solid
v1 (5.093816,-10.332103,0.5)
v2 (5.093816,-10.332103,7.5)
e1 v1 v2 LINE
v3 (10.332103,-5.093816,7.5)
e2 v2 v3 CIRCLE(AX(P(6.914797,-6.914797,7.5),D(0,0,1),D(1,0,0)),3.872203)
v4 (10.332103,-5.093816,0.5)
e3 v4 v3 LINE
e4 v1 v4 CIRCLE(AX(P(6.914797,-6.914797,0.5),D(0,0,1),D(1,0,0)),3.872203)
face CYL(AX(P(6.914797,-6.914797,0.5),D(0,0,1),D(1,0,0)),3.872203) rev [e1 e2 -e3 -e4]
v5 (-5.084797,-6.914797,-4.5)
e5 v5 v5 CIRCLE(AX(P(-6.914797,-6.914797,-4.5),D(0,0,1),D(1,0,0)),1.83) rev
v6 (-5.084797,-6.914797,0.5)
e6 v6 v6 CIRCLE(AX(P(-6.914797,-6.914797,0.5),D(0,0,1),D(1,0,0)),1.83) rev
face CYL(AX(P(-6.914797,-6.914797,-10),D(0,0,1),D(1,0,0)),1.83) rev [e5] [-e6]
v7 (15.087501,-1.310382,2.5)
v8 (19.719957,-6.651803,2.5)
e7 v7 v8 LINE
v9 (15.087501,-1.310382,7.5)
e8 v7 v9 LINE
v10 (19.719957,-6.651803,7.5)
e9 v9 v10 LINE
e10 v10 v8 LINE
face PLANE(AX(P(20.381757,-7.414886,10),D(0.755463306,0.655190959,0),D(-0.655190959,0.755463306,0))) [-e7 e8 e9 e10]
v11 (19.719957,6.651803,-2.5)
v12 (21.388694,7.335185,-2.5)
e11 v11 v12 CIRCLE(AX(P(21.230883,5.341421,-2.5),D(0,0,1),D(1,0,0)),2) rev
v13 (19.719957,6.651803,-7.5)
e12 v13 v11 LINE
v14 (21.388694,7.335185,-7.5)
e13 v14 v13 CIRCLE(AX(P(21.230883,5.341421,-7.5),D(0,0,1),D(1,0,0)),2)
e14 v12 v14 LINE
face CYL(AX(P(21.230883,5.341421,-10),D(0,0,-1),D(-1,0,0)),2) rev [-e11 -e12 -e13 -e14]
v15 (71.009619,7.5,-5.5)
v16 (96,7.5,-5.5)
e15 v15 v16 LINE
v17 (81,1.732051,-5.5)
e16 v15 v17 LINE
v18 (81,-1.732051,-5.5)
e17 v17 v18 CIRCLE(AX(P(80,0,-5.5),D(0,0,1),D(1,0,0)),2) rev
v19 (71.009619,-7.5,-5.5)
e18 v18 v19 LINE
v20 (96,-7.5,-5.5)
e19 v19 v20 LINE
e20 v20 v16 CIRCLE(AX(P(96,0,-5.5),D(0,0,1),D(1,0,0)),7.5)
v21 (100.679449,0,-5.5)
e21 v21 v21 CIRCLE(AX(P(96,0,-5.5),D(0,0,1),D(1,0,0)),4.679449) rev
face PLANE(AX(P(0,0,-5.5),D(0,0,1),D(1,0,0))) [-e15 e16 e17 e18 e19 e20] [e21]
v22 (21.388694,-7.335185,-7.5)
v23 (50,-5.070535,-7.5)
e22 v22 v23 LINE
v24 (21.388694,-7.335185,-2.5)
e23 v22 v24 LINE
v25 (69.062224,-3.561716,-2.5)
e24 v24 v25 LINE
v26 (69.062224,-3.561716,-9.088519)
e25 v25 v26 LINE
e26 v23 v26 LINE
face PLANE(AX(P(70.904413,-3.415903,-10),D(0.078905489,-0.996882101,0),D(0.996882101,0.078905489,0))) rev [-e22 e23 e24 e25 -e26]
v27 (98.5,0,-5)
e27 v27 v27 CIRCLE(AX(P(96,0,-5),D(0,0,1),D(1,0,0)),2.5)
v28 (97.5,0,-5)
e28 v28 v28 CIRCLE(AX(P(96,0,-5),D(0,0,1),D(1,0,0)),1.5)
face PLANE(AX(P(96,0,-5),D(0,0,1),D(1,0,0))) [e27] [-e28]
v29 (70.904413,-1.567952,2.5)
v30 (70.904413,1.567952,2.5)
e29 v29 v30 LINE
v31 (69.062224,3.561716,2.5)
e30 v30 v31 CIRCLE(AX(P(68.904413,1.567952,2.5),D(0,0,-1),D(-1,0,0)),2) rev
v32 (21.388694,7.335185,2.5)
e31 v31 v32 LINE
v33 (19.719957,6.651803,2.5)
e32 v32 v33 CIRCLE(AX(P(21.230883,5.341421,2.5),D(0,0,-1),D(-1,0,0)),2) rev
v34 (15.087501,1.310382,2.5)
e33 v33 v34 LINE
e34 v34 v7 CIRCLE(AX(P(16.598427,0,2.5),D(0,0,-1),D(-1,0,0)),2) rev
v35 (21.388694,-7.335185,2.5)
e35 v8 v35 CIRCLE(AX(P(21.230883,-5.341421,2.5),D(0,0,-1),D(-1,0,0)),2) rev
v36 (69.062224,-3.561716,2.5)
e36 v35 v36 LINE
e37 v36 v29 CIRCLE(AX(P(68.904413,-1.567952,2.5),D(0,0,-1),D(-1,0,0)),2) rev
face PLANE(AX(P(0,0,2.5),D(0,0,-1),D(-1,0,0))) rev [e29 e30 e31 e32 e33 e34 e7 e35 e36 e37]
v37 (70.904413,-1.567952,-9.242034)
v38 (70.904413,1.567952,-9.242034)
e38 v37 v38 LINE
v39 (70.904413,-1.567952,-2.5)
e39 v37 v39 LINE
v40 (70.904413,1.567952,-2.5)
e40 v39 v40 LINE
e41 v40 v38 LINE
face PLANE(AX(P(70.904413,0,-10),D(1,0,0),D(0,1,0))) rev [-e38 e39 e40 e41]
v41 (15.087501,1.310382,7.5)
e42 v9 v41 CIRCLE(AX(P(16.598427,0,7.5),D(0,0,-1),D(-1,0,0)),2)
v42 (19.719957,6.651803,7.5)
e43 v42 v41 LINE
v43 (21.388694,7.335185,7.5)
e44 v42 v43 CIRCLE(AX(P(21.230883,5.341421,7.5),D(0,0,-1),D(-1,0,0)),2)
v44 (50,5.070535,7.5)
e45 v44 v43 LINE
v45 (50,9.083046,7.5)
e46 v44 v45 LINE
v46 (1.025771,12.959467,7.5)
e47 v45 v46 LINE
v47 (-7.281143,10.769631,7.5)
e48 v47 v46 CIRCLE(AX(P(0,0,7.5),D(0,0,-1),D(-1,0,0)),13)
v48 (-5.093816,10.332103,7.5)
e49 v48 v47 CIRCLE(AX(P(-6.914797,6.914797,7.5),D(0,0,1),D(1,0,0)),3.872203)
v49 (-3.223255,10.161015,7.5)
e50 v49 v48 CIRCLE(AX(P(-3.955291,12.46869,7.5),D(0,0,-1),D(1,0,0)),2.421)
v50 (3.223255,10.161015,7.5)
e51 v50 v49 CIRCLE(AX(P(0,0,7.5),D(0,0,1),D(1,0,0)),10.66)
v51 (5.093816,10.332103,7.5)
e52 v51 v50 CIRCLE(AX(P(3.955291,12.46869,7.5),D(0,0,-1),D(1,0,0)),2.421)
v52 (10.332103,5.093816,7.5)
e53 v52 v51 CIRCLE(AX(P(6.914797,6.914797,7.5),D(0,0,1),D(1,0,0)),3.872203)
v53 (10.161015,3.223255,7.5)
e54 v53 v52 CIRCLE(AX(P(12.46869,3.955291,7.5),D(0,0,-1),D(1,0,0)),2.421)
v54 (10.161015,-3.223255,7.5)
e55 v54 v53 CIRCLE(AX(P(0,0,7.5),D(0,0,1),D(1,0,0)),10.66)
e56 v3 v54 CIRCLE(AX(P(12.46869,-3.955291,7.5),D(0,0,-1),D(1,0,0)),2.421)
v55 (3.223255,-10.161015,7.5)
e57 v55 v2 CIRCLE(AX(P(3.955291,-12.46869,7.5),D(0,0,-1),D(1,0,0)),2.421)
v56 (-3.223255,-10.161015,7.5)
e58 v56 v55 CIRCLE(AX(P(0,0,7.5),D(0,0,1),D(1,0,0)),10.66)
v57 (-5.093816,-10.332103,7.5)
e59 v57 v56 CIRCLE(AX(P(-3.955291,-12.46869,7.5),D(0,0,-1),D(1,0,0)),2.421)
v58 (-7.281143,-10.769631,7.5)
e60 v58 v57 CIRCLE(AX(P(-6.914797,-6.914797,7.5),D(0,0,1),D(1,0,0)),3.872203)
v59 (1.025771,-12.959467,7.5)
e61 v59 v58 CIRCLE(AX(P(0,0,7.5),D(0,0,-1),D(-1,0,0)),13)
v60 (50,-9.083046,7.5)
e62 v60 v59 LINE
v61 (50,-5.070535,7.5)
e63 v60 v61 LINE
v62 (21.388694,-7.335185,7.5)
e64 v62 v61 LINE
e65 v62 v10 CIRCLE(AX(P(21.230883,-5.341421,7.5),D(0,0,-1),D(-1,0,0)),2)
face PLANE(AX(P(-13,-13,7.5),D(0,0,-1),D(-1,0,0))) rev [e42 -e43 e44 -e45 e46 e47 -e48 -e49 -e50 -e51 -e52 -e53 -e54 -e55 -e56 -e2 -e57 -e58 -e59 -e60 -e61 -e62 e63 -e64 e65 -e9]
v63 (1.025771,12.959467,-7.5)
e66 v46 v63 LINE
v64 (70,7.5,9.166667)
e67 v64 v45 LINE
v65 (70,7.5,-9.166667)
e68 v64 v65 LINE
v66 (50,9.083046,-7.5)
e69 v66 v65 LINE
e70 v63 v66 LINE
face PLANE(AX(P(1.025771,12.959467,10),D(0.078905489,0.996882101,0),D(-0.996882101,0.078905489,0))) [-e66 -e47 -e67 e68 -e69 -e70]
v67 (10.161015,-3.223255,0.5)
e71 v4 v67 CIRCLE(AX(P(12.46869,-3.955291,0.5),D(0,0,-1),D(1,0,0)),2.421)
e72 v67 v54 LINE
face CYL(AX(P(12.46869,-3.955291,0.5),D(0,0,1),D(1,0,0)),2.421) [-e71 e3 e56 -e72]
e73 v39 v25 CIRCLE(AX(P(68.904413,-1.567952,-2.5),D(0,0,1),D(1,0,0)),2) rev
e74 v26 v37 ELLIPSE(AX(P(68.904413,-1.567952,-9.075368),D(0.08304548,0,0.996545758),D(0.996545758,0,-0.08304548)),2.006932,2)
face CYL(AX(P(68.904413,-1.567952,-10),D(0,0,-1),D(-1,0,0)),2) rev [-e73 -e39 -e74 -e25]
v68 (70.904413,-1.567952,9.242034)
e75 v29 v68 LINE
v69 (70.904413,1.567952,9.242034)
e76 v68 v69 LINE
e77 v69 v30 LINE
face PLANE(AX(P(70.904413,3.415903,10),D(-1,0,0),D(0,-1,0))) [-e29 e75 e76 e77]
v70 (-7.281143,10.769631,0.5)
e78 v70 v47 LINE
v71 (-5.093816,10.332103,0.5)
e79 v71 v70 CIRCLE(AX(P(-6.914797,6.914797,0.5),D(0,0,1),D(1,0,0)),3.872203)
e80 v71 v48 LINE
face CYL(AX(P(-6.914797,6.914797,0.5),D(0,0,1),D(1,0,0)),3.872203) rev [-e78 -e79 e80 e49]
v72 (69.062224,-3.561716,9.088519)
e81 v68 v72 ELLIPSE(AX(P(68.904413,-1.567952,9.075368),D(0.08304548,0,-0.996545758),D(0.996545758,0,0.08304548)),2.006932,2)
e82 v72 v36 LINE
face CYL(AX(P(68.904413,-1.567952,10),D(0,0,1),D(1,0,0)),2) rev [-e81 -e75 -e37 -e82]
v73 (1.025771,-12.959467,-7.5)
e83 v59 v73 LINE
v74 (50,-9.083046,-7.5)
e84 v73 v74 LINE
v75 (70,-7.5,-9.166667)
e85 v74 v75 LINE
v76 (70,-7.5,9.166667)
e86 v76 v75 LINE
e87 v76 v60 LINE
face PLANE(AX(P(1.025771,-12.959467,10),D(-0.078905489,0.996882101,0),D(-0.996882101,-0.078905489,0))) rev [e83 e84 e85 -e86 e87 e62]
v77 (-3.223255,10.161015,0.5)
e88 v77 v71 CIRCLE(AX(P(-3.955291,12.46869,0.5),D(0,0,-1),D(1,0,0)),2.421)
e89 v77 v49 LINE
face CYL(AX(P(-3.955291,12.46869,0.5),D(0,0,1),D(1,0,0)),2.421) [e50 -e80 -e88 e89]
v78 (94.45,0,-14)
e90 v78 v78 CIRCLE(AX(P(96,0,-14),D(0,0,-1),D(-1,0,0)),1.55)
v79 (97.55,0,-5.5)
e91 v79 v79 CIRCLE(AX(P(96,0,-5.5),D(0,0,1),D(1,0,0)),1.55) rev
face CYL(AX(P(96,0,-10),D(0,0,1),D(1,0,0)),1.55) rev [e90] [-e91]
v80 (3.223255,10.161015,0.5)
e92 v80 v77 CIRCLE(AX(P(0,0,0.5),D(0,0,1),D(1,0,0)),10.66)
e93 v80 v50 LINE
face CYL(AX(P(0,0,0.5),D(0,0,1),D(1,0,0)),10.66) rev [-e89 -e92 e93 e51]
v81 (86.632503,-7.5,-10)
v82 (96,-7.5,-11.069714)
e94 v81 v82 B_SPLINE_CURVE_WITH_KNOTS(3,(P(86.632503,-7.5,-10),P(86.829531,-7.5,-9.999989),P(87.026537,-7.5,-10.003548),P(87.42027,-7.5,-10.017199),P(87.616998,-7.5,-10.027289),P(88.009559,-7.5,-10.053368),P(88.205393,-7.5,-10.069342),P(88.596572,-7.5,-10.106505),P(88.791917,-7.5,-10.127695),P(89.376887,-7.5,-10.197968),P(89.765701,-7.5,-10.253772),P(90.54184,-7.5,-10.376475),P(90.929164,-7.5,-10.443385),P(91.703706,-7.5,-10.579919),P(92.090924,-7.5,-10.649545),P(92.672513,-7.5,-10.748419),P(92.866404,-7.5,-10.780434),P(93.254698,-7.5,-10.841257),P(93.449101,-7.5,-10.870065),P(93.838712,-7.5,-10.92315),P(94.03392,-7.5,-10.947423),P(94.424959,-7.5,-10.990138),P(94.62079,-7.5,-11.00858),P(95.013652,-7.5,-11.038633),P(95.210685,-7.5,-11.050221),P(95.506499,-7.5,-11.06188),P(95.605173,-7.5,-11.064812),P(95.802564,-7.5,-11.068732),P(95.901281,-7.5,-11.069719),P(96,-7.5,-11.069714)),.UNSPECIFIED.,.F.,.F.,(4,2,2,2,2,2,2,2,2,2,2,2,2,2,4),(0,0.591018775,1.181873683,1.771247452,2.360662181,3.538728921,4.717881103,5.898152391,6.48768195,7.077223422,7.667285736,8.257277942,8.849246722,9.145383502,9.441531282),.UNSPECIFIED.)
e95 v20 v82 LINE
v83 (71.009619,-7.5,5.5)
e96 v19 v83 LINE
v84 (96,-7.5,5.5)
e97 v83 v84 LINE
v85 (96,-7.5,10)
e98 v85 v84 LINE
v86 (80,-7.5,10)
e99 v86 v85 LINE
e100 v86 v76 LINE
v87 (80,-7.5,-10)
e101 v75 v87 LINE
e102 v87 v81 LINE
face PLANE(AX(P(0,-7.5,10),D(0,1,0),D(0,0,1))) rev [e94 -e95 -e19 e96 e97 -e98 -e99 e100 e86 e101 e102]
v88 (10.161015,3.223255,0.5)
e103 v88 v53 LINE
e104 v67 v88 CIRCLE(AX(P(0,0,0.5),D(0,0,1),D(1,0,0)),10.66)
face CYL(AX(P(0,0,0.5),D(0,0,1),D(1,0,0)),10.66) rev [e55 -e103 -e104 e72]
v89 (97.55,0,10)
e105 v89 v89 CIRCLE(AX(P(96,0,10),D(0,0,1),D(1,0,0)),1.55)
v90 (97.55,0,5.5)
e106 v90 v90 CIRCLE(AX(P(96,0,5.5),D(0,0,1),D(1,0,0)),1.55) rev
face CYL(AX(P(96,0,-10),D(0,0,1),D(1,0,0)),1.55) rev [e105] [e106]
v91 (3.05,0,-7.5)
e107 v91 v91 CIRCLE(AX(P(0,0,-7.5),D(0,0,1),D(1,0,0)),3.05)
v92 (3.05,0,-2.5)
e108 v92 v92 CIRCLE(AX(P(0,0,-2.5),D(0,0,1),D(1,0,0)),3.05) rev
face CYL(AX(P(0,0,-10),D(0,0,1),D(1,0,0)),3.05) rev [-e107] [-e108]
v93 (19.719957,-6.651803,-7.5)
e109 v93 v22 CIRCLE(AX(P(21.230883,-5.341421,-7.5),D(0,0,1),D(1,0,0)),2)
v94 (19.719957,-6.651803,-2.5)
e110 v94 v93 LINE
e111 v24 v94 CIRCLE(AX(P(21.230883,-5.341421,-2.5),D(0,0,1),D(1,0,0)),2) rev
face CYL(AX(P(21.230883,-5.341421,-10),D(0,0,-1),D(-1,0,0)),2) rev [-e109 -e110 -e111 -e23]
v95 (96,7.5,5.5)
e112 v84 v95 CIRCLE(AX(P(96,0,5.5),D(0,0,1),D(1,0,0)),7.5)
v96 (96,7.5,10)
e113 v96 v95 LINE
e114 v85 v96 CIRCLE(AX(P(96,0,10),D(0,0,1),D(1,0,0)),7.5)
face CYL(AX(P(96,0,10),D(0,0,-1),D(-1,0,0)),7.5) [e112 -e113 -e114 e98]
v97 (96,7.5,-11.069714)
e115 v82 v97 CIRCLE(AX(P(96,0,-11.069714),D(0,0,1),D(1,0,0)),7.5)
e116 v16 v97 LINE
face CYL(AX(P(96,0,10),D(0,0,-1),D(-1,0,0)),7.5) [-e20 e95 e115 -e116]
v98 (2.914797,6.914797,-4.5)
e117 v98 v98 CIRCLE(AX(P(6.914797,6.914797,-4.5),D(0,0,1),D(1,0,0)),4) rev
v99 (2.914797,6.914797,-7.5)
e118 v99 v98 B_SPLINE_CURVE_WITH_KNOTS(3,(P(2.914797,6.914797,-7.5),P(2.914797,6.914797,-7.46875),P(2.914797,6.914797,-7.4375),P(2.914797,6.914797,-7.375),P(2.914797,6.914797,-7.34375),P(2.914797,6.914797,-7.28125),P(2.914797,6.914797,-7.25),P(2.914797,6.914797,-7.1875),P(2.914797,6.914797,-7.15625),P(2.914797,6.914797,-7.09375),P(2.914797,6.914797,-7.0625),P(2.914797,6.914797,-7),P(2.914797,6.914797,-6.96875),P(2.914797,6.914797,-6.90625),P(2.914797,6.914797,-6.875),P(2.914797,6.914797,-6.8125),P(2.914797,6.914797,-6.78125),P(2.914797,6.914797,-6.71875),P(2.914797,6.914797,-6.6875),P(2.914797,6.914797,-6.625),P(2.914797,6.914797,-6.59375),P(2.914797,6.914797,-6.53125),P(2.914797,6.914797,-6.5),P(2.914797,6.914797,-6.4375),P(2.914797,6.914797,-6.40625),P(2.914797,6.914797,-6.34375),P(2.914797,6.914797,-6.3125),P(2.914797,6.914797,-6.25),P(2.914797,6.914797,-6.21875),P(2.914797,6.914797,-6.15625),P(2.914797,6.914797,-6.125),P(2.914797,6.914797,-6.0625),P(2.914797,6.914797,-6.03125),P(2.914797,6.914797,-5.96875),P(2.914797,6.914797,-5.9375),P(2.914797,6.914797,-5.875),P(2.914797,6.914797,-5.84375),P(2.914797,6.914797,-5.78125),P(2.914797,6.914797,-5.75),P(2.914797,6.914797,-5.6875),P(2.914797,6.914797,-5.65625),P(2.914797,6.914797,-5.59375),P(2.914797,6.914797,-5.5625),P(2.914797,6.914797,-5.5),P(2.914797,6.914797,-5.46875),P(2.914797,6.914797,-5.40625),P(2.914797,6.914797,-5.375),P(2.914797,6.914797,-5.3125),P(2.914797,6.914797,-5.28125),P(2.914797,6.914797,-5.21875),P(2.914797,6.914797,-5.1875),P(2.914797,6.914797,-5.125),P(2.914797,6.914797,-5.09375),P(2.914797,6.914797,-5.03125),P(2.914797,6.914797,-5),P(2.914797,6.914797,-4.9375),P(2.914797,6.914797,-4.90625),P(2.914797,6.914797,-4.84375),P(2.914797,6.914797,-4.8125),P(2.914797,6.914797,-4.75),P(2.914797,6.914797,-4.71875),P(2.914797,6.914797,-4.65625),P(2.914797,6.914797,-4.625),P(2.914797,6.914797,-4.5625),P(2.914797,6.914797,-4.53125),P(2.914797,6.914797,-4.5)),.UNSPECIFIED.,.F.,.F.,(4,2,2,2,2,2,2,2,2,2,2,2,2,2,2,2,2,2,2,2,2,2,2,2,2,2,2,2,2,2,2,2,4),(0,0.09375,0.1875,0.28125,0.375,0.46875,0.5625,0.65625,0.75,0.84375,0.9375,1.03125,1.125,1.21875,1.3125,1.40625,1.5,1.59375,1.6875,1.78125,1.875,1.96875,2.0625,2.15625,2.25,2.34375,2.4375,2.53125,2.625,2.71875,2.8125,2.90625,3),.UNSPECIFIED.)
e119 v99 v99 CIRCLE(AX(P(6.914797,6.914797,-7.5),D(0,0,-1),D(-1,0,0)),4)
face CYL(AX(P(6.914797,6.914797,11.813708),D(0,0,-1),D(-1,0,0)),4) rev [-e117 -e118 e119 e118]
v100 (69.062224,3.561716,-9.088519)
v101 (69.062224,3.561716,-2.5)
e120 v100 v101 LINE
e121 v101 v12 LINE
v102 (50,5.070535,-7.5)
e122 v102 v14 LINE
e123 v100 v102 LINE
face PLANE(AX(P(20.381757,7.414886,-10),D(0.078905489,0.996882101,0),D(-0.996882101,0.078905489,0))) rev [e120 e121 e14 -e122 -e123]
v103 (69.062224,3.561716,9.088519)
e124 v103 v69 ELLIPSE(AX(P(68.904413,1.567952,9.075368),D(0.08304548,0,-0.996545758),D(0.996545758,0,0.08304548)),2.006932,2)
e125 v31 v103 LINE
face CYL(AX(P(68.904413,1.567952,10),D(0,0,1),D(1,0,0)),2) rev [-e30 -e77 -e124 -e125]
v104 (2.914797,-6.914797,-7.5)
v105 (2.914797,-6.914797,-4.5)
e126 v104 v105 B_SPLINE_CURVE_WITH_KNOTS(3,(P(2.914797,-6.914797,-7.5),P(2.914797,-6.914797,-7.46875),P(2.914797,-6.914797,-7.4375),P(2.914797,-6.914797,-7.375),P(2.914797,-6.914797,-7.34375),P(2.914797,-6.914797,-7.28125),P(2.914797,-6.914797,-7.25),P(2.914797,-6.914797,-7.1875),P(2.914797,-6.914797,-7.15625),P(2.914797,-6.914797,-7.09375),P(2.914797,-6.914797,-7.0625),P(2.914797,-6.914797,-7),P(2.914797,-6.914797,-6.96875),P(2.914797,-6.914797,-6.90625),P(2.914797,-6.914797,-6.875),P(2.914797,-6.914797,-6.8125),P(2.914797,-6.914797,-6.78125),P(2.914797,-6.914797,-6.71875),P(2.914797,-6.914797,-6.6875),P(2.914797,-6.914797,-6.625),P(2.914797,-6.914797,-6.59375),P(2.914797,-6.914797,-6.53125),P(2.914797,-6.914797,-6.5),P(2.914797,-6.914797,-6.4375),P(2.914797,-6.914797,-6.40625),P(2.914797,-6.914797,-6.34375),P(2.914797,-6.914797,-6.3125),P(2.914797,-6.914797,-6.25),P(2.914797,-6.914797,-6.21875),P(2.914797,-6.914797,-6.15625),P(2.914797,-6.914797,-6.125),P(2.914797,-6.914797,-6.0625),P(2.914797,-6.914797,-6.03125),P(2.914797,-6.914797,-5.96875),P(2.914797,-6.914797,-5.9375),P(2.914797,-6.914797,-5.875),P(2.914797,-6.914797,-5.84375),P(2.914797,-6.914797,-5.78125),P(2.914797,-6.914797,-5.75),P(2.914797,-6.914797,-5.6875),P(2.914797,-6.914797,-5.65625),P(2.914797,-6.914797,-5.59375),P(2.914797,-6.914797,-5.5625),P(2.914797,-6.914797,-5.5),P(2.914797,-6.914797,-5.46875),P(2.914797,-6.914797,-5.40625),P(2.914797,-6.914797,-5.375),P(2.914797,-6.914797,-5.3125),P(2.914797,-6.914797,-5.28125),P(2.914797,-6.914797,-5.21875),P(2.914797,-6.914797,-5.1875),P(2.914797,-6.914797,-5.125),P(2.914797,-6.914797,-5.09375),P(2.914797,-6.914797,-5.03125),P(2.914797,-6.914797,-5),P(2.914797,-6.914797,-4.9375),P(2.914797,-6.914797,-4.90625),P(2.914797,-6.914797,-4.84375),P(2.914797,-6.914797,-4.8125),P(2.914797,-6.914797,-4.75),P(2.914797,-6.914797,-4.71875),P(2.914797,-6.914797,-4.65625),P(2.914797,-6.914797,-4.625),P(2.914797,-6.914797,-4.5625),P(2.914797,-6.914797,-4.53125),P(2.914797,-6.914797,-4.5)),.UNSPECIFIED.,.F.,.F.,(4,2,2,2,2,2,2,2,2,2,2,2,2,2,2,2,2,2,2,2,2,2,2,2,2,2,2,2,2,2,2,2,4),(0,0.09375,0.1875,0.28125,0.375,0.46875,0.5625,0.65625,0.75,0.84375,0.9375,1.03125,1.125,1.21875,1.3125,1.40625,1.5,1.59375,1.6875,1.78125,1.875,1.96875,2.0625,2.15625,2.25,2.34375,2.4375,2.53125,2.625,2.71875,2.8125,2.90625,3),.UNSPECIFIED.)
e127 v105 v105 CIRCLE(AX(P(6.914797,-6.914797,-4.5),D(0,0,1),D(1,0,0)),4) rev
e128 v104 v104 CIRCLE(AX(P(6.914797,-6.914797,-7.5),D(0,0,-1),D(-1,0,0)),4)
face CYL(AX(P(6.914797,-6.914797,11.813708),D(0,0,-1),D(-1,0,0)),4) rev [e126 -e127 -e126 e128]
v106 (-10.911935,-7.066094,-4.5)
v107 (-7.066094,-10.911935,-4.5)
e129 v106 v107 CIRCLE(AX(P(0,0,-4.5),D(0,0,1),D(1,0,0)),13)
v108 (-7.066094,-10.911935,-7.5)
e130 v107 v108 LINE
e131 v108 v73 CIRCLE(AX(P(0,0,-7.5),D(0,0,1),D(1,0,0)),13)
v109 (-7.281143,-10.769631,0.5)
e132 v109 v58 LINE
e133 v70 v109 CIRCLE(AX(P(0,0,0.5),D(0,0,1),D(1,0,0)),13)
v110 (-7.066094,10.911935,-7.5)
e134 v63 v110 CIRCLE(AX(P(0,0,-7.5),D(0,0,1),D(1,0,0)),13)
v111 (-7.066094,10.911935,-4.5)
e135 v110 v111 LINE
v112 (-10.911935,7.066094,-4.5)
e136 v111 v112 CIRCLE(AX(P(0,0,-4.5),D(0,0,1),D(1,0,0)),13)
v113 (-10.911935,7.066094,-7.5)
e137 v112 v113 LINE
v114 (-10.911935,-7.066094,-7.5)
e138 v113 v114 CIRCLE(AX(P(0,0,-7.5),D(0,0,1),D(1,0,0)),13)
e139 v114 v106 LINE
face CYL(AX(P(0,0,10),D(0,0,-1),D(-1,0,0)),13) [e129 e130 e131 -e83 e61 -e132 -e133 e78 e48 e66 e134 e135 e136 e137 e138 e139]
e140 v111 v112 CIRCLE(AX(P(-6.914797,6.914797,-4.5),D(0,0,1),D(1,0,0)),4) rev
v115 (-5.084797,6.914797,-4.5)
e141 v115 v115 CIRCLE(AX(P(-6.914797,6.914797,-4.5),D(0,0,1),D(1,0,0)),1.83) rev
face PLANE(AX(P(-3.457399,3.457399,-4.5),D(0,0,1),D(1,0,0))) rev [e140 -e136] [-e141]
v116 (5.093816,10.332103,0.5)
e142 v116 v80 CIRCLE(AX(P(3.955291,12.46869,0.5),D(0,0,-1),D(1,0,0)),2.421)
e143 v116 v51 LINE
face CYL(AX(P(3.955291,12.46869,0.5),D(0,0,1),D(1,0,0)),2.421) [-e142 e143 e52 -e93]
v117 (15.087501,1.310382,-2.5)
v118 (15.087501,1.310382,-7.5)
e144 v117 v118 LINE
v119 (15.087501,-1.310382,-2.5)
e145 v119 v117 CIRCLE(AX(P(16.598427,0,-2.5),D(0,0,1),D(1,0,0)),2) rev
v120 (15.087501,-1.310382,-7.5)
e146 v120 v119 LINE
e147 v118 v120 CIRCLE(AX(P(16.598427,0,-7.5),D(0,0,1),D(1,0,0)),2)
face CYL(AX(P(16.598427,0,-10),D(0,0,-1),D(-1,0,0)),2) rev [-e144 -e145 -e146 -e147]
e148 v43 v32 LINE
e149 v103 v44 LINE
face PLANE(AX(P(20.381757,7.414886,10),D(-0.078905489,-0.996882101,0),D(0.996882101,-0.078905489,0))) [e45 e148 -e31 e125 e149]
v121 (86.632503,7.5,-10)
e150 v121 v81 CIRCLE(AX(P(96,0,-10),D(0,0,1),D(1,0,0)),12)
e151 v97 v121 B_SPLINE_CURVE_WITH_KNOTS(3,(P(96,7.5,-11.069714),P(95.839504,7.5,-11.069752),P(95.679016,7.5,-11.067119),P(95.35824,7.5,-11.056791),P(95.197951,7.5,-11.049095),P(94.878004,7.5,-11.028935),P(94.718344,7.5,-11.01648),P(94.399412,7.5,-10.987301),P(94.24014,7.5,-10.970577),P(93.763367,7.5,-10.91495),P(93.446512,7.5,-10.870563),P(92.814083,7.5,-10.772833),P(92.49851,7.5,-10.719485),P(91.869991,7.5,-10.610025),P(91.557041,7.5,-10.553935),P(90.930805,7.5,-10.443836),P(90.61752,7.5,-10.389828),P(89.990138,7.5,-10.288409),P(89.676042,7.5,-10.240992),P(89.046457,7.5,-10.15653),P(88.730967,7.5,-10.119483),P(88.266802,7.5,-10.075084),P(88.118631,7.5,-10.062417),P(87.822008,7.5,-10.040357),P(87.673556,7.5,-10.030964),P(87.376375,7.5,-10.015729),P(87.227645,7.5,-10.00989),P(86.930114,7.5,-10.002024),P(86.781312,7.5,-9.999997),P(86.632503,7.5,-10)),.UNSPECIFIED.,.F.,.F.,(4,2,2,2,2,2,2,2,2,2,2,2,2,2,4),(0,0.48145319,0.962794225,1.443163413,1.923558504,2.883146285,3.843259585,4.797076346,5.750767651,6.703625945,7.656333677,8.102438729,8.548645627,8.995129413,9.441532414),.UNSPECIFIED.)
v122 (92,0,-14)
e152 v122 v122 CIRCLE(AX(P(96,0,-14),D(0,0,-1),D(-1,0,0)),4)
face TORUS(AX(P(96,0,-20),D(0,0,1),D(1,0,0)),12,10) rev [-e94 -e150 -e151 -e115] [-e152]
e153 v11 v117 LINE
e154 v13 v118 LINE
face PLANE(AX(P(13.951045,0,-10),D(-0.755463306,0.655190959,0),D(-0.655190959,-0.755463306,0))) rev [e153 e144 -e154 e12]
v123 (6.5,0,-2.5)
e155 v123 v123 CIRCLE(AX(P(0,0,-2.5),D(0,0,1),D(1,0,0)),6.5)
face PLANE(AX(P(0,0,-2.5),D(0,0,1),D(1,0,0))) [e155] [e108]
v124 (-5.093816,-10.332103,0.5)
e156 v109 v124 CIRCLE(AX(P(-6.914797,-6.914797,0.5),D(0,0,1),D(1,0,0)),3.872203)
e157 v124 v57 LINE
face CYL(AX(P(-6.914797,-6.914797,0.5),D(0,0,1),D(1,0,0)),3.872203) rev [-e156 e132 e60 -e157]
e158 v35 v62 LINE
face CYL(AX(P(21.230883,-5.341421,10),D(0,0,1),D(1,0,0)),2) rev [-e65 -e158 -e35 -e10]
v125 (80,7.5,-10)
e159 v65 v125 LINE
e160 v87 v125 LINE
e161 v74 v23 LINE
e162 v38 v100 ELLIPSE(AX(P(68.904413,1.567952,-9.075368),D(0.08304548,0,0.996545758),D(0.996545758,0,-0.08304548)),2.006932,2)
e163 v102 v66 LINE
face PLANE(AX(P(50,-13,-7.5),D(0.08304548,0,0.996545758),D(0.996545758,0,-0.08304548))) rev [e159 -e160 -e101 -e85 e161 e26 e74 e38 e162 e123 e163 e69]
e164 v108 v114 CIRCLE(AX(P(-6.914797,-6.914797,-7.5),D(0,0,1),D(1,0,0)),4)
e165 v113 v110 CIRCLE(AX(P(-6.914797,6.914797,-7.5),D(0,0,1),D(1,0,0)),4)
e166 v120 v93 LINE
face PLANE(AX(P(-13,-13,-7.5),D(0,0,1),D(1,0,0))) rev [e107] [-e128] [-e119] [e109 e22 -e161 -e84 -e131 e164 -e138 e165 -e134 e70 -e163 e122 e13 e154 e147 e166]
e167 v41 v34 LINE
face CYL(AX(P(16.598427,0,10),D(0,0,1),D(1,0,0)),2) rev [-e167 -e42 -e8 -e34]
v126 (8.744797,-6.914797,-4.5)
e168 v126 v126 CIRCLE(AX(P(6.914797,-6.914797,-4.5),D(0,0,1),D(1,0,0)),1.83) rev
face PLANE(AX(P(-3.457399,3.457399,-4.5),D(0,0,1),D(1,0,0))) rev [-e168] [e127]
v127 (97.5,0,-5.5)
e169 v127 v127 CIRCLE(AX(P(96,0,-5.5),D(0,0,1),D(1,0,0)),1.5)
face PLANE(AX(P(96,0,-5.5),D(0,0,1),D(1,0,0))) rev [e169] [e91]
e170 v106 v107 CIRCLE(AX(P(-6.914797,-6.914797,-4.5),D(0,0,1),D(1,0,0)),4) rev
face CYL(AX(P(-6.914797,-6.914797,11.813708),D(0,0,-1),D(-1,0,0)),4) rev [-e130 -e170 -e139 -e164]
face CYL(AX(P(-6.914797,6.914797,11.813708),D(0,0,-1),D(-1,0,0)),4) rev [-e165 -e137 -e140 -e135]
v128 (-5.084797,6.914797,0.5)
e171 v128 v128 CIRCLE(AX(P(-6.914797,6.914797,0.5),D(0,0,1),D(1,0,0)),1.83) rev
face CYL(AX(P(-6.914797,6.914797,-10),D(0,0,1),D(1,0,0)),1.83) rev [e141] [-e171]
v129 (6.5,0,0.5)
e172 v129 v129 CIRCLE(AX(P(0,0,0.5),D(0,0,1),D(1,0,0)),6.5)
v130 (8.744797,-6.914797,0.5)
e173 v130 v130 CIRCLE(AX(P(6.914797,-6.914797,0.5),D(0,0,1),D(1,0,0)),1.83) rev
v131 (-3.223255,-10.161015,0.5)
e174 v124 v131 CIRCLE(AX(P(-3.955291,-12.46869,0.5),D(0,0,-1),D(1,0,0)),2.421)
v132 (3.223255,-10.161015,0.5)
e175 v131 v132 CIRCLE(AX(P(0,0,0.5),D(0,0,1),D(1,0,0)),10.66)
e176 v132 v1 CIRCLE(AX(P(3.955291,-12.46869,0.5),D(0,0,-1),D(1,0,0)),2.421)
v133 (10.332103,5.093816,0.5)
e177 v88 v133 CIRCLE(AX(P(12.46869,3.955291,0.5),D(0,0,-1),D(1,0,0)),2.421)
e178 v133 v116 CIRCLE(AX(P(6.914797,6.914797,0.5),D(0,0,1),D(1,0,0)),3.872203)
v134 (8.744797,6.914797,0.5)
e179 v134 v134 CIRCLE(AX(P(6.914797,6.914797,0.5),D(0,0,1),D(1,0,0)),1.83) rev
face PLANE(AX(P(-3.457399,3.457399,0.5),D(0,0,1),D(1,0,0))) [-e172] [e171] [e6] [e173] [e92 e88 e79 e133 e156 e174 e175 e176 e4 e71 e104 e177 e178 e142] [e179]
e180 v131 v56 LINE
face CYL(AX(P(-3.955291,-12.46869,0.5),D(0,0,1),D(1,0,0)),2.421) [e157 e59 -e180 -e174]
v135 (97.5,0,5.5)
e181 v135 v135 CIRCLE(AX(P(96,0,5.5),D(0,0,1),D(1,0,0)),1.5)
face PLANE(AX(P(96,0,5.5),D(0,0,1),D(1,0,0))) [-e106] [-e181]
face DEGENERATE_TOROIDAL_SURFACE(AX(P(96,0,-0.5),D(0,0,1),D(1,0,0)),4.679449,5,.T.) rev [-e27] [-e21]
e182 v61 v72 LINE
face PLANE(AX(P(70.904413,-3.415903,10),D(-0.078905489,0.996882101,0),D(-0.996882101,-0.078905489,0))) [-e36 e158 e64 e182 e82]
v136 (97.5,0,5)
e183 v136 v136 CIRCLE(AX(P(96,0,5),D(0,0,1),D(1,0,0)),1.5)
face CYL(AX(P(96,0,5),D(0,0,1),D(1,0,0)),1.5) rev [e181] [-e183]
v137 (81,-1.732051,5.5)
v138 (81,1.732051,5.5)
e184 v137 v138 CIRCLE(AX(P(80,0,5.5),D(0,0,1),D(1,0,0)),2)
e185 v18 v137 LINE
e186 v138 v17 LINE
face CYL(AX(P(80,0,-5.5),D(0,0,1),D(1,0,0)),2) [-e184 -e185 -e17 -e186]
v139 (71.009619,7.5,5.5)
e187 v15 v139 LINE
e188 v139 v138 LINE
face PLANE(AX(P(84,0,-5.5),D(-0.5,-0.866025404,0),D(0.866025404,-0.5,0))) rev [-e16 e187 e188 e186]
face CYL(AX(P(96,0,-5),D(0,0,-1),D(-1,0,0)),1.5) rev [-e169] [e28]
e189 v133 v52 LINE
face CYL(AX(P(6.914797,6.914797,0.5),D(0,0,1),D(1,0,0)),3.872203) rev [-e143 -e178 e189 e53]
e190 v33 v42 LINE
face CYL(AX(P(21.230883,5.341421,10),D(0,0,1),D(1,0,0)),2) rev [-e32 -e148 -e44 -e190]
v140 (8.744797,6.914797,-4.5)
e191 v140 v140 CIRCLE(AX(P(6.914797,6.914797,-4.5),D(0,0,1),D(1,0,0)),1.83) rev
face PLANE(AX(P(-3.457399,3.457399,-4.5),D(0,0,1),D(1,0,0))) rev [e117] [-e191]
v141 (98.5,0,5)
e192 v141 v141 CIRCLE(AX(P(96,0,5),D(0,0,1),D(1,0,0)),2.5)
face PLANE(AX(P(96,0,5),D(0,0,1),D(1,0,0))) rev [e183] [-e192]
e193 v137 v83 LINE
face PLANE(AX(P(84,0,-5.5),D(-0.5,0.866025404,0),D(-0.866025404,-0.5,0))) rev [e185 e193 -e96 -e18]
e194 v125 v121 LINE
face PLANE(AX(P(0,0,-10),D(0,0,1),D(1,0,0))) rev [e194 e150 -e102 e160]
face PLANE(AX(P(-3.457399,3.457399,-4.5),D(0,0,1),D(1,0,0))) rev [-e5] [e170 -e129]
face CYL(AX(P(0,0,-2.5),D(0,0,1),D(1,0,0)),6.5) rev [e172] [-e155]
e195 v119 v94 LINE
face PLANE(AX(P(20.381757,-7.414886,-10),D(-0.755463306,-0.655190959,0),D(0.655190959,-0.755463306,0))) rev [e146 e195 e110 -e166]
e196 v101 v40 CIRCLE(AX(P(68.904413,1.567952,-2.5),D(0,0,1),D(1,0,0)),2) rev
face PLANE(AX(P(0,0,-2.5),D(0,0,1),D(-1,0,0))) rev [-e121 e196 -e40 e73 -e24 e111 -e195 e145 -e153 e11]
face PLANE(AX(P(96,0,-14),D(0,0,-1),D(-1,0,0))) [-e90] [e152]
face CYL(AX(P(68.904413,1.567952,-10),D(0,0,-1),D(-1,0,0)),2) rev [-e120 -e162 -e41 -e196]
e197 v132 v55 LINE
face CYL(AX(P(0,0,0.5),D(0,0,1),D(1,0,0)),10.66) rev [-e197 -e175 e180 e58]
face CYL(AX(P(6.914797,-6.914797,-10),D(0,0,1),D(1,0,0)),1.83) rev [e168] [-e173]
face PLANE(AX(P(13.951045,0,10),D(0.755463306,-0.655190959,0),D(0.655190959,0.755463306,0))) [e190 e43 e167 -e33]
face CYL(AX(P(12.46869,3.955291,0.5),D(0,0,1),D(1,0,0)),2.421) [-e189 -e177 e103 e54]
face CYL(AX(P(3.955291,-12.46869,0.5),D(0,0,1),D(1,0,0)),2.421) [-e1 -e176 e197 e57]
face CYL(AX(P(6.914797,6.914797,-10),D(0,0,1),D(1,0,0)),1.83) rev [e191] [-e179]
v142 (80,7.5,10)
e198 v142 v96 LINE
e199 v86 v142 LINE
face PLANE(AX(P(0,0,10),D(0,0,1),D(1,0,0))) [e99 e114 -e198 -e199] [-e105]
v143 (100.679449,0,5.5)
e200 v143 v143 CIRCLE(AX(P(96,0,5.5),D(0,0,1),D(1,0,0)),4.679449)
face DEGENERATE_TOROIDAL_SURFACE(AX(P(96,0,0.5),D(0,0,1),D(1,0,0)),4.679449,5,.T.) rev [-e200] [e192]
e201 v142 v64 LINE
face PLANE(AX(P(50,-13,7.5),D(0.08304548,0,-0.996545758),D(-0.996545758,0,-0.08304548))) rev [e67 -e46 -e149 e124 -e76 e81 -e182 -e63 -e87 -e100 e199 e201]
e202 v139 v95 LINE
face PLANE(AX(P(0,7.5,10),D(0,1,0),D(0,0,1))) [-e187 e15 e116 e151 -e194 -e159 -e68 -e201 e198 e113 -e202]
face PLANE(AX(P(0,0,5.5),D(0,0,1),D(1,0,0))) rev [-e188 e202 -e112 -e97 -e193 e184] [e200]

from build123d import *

# Parameters (mm, degrees)
SKETCH2_R               = 13
SKETCH2_R_2             = 7.5
BOSS_EXTRUDE2_DEPTH     = 10
CUT_EXTRUDE1_DEPTH      = 105.791459576
CUT_EXTRUDE1_DEPTH_BACK = 105.791459576
SKETCH5_R               = 1.83
SKETCH5_R_2             = 3.05
CUT_EXTRUDE2_DEPTH      = 106.770979007
HUB_CUTOUT_DEPTH        = 7
SKETCH8_R               = 6.5
CUT_EXTRUDE4_DEPTH      = 3
CUT_EXTRUDE5_DEPTH      = 105.791459576
CUT_EXTRUDE5_DEPTH_BACK = 105.791459576
SKETCH9_R               = 1.55
CUT_EXTRUDE6_DEPTH      = 5.5
FILLET1_R               = 2
CUT_EXTRUDE7_START      = 2.5
CUT_EXTRUDE7_DEPTH      = 103.291459576
FILLET2_R               = 2
FILLET2_OF_MIRROR1_R    = 2
SKETCH12_R              = 4
SKETCH12_R_2            = 1.55
BOSS_EXTRUDE3_DEPTH     = 4
FILLET3_START           = -14
FILLET3_2_DEPTH         = 4
BOSS_EXTRUDE4_START     = 5.5
SKETCH13_R              = 2.5
SKETCH13_R_2            = 1.5
BOSS_EXTRUDE4_DEPTH     = 0.5
BOSS_EXTRUDE5_START     = -5
SKETCH13_2_R            = 2.5
SKETCH13_2_R_2          = 1.5
BOSS_EXTRUDE5_DEPTH     = 0.5
FILLET4_R               = 5
SKETCH15_R              = 4
CUT_EXTRUDE8_DEPTH      = 3


with BuildPart() as part:
    # Sketch2 → Boss-Extrude2 (new, symmetric)
    with BuildSketch(Plane.XY):
        Circle(SKETCH2_R)
        with BuildLine():
            Line((70, 7.5), (1.025771359, 12.959467316))
            ThreePointArc((1.025771359, 12.959467316), (9.548168088, 8.822272166), (13, 0))
            ThreePointArc((13, 0), (9.548168088, -8.822272166), (1.025771359, -12.959467316))
            Line((1.025771359, -12.959467316), (70, -7.5))
            Line((70, -7.5), (70, 7.5))
        make_face()
        with BuildLine():
            Line((96, 7.5), (70, 7.5))
            Line((70, 7.5), (70, -7.5))
            Line((70, -7.5), (96, -7.5))
            ThreePointArc((96, -7.5), (88.5, 0), (96, 7.5))
        make_face()
        with Locations((96, 0)):
            Circle(SKETCH2_R_2)
        Circle(SKETCH2_R)
    extrude(amount=BOSS_EXTRUDE2_DEPTH, both=True)

    # Sketch4 → Cut-Extrude1 (cut, two sides: drawn at the far end of the back side and taken through both)
    with BuildSketch(Plane(origin=(0, 0, 0), x_dir=(1, 0, 0), z_dir=(0, 1, 0)).offset(-CUT_EXTRUDE1_DEPTH_BACK)):
        Polygon((-13, 7.5), (50, 7.5), (80, 10), (-13, 10), align=None)
        Polygon((-13, -7.5), (50, -7.5), (80, -10), (-13, -10), align=None)
    extrude(amount=CUT_EXTRUDE1_DEPTH + CUT_EXTRUDE1_DEPTH_BACK, mode=Mode.SUBTRACT)

    # Sketch5 → Cut-Extrude2 (cut, through all)
    with BuildSketch(Plane.XY.offset(7.5)):
        with Locations((-6.914797213, 6.914797213)):
            Circle(SKETCH5_R)
        with Locations((6.914797213, 6.914797213)):
            Circle(SKETCH5_R)
        with Locations((6.914797213, -6.914797213)):
            Circle(SKETCH5_R)
        with Locations((-6.914797213, -6.914797213)):
            Circle(SKETCH5_R)
        Circle(SKETCH5_R_2)
    extrude(amount=-CUT_EXTRUDE2_DEPTH, mode=Mode.SUBTRACT)

    # Sketch7 → hub cutout (cut)
    with BuildSketch(Plane.XY.offset(7.5)):
        with BuildLine():
            ThreePointArc((-7.281143007, 10.769631215), (-13, 0), (-7.281143007, -10.769631215))
            ThreePointArc((-7.281143007, -10.769631215), (-6.15529138, -10.711783559), (-5.093815501, -10.332103173))
            ThreePointArc((-5.093815501, -10.332103173), (-4.17580433, -10.057753531), (-3.223255475, -10.161014917))
            ThreePointArc((-3.223255475, -10.161014917), (0, -10.66), (3.223255475, -10.161014917))
            ThreePointArc((3.223255475, -10.161014917), (4.17580433, -10.057753531), (5.093815501, -10.332103173))
            ThreePointArc((5.093815501, -10.332103173), (9.652858062, -9.652858062), (10.332103173, -5.093815501))
            ThreePointArc((10.332103173, -5.093815501), (10.057753531, -4.17580433), (10.161014917, -3.223255475))
            ThreePointArc((10.161014917, -3.223255475), (10.66, 0), (10.161014917, 3.223255475))
            ThreePointArc((10.161014917, 3.223255475), (10.057753531, 4.17580433), (10.332103173, 5.093815501))
            ThreePointArc((10.332103173, 5.093815501), (9.652858062, 9.652858062), (5.093815501, 10.332103173))
            ThreePointArc((5.093815501, 10.332103173), (4.17580433, 10.057753531), (3.223255475, 10.161014917))
            ThreePointArc((3.223255475, 10.161014917), (0, 10.66), (-3.223255475, 10.161014917))
            ThreePointArc((-3.223255475, 10.161014917), (-4.17580433, 10.057753531), (-5.093815501, 10.332103173))
            ThreePointArc((-5.093815501, 10.332103173), (-6.15529138, 10.711783559), (-7.281143007, 10.769631215))
        make_face()
    extrude(amount=-HUB_CUTOUT_DEPTH, mode=Mode.SUBTRACT)

    # Sketch8 → Cut-Extrude4 (cut)
    with BuildSketch(Plane.XY.offset(0.5)):
        Circle(SKETCH8_R)
    extrude(amount=-CUT_EXTRUDE4_DEPTH, mode=Mode.SUBTRACT)

    # Sketch9 → Cut-Extrude5 (cut, two sides: drawn at the far end of the back side and taken through both)
    with BuildSketch(Plane.XY.offset(-CUT_EXTRUDE5_DEPTH_BACK)):
        with Locations((96, 0)):
            Circle(SKETCH9_R)
    extrude(amount=CUT_EXTRUDE5_DEPTH + CUT_EXTRUDE5_DEPTH_BACK, mode=Mode.SUBTRACT)

    # Sketch10 → Cut-Extrude6 (cut, symmetric)
    with BuildSketch(Plane.XY):
        Polygon((84, 0), (62.184725581, 12.595054558), (110.068063566, 12.595054558), (110.068063566, -12.520209035), (62.31436183, -12.520209035), align=None)
    extrude(amount=CUT_EXTRUDE6_DEPTH, both=True, mode=Mode.SUBTRACT)

    # Fillet1
    fillet1_edges = [part.edges().sort_by_distance(p)[0] for p in [
        (84, 0, 0),
    ]]
    fillet(fillet1_edges, radius=FILLET1_R)

    # Sketch11 → Cut-Extrude7 (cut, through all)
    with BuildSketch(Plane.XY.offset(CUT_EXTRUDE7_START)):
        Polygon((13.951045221, 0), (20.381756661, 7.414886386), (70.904413477, 3.415903011), (70.904413477, 0), (70.904413477, -3.415903011), (20.381756661, -7.414886386), align=None)
    cut_extrude7 = extrude(amount=CUT_EXTRUDE7_DEPTH, mode=Mode.SUBTRACT)

    # Fillet2
    fillet2_edges = [part.edges().sort_by_distance(p)[0] for p in [
        (13.951045221, 0, 5),
        (20.381756661, 7.414886386, 5),
        (20.381756661, -7.414886386, 5),
        (70.904413477, -3.415903011, 5.871017228),
        (70.904413477, 3.415903011, 5.871017228),
    ]]
    fillet(fillet2_edges, radius=FILLET2_R)

    # Mirror1: Cut-Extrude7 across plane
    add(cut_extrude7.mirror(Plane.XY), mode=Mode.SUBTRACT)

    # Fillet2 of Mirror1
    fillet2_of_mirror1_edges = [part.edges().sort_by_distance(p)[0] for p in [
        (13.951045221, 0, -5),
        (20.381756661, 7.414886386, -5),
        (20.381756661, -7.414886386, -5),
        (70.904413477, -3.415903011, -5.871017228),
        (70.904413477, 3.415903011, -5.871017228),
    ]]
    fillet(fillet2_of_mirror1_edges, radius=FILLET2_OF_MIRROR1_R)

    # Sketch12 → Boss-Extrude3 (add)
    with BuildSketch(Plane(origin=(0, 0, -10), x_dir=(-1, 0, 0), z_dir=(0, 0, -1))):
        with Locations(Location((-96, 0, 0), (0, 0, 180))):
            Circle(SKETCH12_R)
        with Locations(Location((-96, 0, 0), (0, 0, 180))):
            Circle(SKETCH12_R_2, mode=Mode.SUBTRACT)
    extrude(amount=BOSS_EXTRUDE3_DEPTH)

    # Fillet3: read off the stored shape, not the designer's step
    # Fillet3 outline → Fillet3 (revolve)
    with BuildSketch(Plane(origin=(96, 0, 0), x_dir=(1, 0, 0), z_dir=(0, -1, 0))):
        with BuildLine():
            ThreePointArc((4, -14), (7.527864045, -11.05572809), (12, -10))
            Line((12, -10), (4, -10))
            Line((4, -10), (4, -14))
        make_face()
    revolve(axis=Axis((96, 0, 0), (0, 0, 1)))

    # Fillet3 2 outline → Fillet3 2 (cut)
    with BuildSketch(Plane.XY.offset(FILLET3_START)):
        with BuildLine():
            ThreePointArc((96, 7.5), (103.5, 0), (96, -7.5))
            Line((96, -7.5), (85, -7.5))
            Line((85, -7.5), (85, -13))
            Line((85, -13), (109, -13))
            Line((109, -13), (109, 13))
            Line((109, 13), (85, 13))
            Line((85, 13), (85, 7.5))
            Line((85, 7.5), (96, 7.5))
        make_face()
    extrude(amount=FILLET3_2_DEPTH, mode=Mode.SUBTRACT)

    # Sketch13 → Boss-Extrude4 (add)
    with BuildSketch(Plane.XY.offset(BOSS_EXTRUDE4_START)):
        with Locations((96, 0)):
            Circle(SKETCH13_R)
        with Locations((96, 0)):
            Circle(SKETCH13_R_2, mode=Mode.SUBTRACT)
    extrude(amount=-BOSS_EXTRUDE4_DEPTH)

    # Sketch13<2> → Boss-Extrude5 (add)
    with BuildSketch(Plane.XY.offset(BOSS_EXTRUDE5_START)):
        with Locations((96, 0)):
            Circle(SKETCH13_2_R)
        with Locations((96, 0)):
            Circle(SKETCH13_2_R_2, mode=Mode.SUBTRACT)
    extrude(amount=-BOSS_EXTRUDE5_DEPTH)

    # Fillet4
    # the kernel refuses this fillet: 5 mm, written as the material it adds along each edge
    with BuildSketch(Plane(origin=(96, 0, 5.5), x_dir=(1, 0, 0), z_dir=(0, -1, 0))) as fillet4_piece_1:
        with BuildLine():
            CenterArc((4.679449472, -5), FILLET4_R, 90, 25.841932763)
            Line((2.5, -0.5), (2.456411011, -0.41))
            ThreePointArc((2.456411011, -0.41), (2.4, -0.25), (2.4, 0))
            Line((2.4, 0), (2.5, 0.1))
            Line((2.5, 0.1), (4.679449472, 0.1))
            Line((4.679449472, 0.1), (4.679449472, 0))
        make_face()
    revolve(axis=Axis((96, 0, 5.5), (0, 0, 1)))
    with BuildSketch(Plane(origin=(96, 0, -5.5), x_dir=(1, 0, 0), z_dir=(0, -1, 0))) as fillet4_piece_2:
        with BuildLine():
            CenterArc((4.679449472, 5), FILLET4_R, 244.158067237, 25.841932763)
            Line((2.5, 0.5), (2.456411011, 0.41))
            ThreePointArc((2.456411011, 0.41), (2.4, 0.25), (2.4, 0))
            Line((2.4, 0), (2.5, -0.1))
            Line((2.5, -0.1), (4.679449472, -0.1))
            Line((4.679449472, -0.1), (4.679449472, 0))
        make_face()
    revolve(axis=Axis((96, 0, -5.5), (0, 0, 1)))

    # Sketch15 → Cut-Extrude8 (cut)
    with BuildSketch(Plane(origin=(0, 0, -7.5), x_dir=(-1, 0, 0), z_dir=(0, 0, -1))):
        with Locations((6.914797213, -6.914797213)):
            Circle(SKETCH15_R)
        with Locations((-6.914797213, -6.914797213)):
            Circle(SKETCH15_R)
        with Locations((6.914797213, 6.914797213)):
            Circle(SKETCH15_R)
        with Locations((-6.914797213, 6.914797213)):
            Circle(SKETCH15_R)
    extrude(amount=-CUT_EXTRUDE8_DEPTH, mode=Mode.SUBTRACT)


solid = part.part
